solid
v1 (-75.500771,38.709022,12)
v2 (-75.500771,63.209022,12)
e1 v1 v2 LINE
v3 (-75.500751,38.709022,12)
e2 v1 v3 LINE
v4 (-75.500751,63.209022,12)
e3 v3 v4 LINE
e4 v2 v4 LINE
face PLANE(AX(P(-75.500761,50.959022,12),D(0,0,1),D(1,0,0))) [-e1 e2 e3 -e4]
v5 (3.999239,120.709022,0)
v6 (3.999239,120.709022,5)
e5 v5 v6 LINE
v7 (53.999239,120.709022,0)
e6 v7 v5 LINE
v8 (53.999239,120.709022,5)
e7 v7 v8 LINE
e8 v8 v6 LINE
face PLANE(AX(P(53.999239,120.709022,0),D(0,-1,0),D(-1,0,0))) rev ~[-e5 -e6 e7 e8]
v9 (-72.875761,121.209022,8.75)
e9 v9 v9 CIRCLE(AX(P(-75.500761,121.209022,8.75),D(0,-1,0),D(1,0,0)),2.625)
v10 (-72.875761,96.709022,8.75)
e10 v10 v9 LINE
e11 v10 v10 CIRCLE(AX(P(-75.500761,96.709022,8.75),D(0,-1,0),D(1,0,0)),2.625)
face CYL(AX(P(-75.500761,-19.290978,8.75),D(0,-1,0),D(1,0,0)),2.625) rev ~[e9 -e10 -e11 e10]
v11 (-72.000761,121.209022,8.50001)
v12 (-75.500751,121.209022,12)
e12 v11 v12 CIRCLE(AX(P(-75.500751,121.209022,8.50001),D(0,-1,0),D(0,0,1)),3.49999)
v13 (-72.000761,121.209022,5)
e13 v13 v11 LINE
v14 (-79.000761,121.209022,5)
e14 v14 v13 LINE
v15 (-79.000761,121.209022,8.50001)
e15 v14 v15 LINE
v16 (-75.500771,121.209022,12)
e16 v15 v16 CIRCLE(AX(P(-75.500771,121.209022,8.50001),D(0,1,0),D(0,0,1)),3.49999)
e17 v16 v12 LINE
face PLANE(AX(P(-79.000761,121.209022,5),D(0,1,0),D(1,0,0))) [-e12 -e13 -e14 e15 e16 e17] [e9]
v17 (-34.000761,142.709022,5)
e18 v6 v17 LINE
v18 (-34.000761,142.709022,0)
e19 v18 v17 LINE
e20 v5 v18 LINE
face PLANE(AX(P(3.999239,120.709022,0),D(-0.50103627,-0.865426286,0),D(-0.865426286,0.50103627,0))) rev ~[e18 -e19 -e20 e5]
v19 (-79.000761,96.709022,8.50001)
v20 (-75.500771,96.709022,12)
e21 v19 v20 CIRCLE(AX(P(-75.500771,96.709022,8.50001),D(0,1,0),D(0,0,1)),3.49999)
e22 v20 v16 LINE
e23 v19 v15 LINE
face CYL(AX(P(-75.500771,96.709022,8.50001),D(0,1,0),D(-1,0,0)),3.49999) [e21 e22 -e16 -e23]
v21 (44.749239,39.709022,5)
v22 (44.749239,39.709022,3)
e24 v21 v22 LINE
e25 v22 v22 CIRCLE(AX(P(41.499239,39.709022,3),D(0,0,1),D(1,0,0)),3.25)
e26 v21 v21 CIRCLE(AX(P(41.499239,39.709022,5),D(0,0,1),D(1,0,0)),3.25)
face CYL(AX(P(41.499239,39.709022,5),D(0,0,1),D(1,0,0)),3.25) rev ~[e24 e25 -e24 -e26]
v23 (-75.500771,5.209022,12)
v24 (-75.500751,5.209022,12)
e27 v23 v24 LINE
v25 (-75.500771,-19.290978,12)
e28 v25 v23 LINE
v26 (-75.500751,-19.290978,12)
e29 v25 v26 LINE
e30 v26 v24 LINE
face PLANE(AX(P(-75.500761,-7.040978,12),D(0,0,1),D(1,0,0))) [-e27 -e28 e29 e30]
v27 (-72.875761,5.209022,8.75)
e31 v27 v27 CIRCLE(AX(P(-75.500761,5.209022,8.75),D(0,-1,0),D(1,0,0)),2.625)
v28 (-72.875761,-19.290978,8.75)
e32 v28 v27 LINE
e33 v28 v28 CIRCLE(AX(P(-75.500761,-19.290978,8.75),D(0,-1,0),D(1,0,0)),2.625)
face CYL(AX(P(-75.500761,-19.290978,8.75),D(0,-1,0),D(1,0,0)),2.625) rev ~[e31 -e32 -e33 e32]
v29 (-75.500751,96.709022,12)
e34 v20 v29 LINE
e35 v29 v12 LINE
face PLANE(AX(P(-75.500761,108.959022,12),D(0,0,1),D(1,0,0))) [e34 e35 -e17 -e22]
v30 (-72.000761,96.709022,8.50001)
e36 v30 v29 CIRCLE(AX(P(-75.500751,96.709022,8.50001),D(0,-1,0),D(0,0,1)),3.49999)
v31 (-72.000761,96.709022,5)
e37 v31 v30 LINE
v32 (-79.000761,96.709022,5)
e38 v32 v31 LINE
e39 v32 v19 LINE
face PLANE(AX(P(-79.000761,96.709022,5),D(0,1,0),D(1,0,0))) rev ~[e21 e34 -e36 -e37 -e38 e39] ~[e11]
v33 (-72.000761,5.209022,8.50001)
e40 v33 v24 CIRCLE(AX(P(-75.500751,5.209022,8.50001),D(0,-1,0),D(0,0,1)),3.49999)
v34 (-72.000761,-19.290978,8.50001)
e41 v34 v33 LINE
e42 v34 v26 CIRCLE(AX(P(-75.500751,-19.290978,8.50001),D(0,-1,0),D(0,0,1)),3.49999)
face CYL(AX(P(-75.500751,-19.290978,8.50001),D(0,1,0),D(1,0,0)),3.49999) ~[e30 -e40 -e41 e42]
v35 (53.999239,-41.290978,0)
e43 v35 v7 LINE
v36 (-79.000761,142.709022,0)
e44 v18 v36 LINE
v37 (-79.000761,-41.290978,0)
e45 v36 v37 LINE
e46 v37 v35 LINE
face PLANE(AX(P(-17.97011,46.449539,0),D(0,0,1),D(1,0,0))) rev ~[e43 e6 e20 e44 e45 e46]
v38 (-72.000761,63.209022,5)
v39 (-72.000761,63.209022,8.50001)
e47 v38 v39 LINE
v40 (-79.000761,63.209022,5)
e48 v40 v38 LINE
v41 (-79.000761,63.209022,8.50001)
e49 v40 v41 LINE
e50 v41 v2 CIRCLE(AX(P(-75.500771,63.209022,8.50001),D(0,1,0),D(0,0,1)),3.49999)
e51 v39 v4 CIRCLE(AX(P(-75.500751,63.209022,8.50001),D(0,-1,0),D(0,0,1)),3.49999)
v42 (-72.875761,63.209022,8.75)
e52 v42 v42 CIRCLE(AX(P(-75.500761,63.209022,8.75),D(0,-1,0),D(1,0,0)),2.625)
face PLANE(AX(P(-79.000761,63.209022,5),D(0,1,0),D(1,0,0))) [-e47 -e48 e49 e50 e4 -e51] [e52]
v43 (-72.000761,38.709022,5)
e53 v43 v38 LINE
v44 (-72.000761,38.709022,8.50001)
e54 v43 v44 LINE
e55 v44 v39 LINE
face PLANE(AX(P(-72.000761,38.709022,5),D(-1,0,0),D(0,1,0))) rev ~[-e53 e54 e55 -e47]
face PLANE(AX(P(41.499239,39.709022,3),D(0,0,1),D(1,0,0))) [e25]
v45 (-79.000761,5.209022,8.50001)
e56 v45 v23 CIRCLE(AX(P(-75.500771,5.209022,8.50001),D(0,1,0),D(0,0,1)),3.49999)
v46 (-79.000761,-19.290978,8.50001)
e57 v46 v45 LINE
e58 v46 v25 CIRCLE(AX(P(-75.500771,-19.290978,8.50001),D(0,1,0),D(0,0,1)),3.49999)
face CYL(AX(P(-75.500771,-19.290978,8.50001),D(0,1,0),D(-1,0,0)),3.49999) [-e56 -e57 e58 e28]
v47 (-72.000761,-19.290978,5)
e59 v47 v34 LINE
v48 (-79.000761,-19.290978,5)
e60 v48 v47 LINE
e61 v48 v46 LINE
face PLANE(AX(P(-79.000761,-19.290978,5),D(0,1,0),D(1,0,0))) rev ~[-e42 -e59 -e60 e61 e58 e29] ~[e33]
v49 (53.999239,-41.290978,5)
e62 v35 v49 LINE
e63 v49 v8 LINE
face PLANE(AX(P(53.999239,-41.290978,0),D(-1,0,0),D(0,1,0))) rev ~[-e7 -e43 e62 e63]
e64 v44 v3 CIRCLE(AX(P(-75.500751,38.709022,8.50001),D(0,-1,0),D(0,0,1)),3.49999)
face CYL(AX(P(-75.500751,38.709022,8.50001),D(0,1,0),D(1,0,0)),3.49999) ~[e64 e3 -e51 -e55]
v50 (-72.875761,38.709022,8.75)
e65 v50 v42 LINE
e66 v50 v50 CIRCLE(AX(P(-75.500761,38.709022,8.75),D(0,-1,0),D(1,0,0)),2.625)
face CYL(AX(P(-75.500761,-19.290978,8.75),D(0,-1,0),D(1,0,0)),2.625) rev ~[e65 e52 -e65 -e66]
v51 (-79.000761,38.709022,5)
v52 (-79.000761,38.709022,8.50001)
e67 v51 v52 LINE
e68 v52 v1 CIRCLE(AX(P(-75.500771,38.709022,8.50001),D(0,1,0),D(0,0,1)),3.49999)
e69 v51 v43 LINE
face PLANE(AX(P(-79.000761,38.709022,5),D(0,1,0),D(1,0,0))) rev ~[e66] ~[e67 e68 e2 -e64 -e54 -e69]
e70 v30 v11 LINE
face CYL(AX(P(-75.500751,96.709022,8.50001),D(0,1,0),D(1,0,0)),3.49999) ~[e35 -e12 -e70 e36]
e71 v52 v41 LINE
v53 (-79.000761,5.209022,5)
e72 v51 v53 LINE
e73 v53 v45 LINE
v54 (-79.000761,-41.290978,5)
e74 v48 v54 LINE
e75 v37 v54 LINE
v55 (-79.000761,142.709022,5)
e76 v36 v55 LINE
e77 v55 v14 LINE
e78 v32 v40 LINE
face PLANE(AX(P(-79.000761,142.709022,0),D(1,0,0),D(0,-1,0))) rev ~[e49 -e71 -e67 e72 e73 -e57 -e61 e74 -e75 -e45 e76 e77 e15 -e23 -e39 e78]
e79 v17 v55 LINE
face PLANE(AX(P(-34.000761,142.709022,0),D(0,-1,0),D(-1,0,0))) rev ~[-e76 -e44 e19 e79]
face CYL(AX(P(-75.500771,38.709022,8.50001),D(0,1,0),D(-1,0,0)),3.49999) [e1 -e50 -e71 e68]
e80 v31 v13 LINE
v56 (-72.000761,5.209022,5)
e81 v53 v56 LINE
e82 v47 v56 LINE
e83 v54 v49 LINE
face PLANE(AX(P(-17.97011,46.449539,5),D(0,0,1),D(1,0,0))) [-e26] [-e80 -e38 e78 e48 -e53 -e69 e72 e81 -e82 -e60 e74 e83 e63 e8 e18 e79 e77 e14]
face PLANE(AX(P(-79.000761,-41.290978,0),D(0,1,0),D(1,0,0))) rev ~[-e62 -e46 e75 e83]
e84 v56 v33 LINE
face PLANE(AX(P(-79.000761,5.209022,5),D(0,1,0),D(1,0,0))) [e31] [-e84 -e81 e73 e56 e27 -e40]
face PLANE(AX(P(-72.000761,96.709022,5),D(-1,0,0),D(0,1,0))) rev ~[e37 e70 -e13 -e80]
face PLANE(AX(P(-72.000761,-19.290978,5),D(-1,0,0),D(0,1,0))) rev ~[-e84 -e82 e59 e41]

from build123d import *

# Parameters (mm, degrees)
F0_W     = 7
F0_H     = 24.5
F1_DEPTH = 5
F2_W     = 7
F2_H     = 24.5
F3_DEPTH = 7
F4_R     = 3.49999
F5_R     = 2.625
F6_DEPTH = 162.001
F7_R     = 3.25
F8_DEPTH = 2


# Not quite as in the source:
# - a fillet or chamfer is up to 0.001 mm smaller than in the source, because OpenCascade refuses the exact size


with BuildPart() as f1:
    # F0 (on Top) → F1 (new body)
    with BuildSketch(Plane.XY):
        Polygon((-34.0007612563, 142.7090217992), (-79.0007612563, 142.7090217992), (-79.0007612563, 121.2090217992), (-72.0007612563, 121.2090217992), (-72.0007612563, 96.7090217992), (-79.0007612563, 96.7090217992), (-79.0007612563, 63.2090217992), (-72.0007612563, 63.2090217992), (-72.0007612563, 38.7090217992), (-79.0007612563, 38.7090217992), (-79.0007612563, 5.2090217992), (-72.0007612563, 5.2090217992), (-72.0007612563, -19.2909782008), (-79.0007612563, -19.2909782008), (-79.0007612563, -41.2909782008), (53.9992387437, -41.2909782008), (53.9992387437, 120.7090218186), (3.9992387437, 120.7090218186), align=None)
        with Locations((-75.5007612563, 108.9590217992)):
            Rectangle(F0_W, F0_H)
        with Locations((-75.5007612563, 50.9590217992)):
            Rectangle(F0_W, F0_H)
        with Locations((-75.5007612563, -7.0409782008)):
            Rectangle(F0_W, F0_H)
    extrude(amount=F1_DEPTH)

    # F2 (on face) → F3 (join)
    with BuildSketch(Plane.XY.offset(5)):
        with Locations((-75.5007612563, 108.9590217992)):
            Rectangle(F2_W, F2_H)
        with Locations((-75.5007612563, 50.9590217992)):
            Rectangle(F2_W, F2_H)
        with Locations((-75.5007612563, -7.0409782008)):
            Rectangle(F2_W, F2_H)
    extrude(amount=F3_DEPTH)

    # F4 (radius 3.5 in the source; OpenCascade refuses exactly that, so slightly less here)
    f4_edges = [f1.edges().sort_by_distance(p)[0] for p in [
        (-72.000761, 108.959022, 12),
        (-72.000761, 50.959022, 12),
        (-79.000761, 50.959022, 12),
        (-79.000761, 108.959022, 12),
        (-72.000761, -7.040978, 12),
        (-79.000761, -7.040978, 12),
    ]]
    fillet(f4_edges, radius=F4_R)

    # F5 (on face) → F6 (cut, through all)
    with BuildSketch(Plane.XZ.offset(19.2909782008)):
        with Locations((-75.5007612563, 8.75)):
            Circle(F5_R)
    extrude(amount=-F6_DEPTH, mode=Mode.SUBTRACT)

    # F7 (on face) → F8 (cut)
    with BuildSketch(Plane.XY.offset(5)):
        with Locations((41.4992387437, 39.7090218089)):
            Circle(F7_R)
    extrude(amount=-F8_DEPTH, mode=Mode.SUBTRACT)


solid = f1.part
